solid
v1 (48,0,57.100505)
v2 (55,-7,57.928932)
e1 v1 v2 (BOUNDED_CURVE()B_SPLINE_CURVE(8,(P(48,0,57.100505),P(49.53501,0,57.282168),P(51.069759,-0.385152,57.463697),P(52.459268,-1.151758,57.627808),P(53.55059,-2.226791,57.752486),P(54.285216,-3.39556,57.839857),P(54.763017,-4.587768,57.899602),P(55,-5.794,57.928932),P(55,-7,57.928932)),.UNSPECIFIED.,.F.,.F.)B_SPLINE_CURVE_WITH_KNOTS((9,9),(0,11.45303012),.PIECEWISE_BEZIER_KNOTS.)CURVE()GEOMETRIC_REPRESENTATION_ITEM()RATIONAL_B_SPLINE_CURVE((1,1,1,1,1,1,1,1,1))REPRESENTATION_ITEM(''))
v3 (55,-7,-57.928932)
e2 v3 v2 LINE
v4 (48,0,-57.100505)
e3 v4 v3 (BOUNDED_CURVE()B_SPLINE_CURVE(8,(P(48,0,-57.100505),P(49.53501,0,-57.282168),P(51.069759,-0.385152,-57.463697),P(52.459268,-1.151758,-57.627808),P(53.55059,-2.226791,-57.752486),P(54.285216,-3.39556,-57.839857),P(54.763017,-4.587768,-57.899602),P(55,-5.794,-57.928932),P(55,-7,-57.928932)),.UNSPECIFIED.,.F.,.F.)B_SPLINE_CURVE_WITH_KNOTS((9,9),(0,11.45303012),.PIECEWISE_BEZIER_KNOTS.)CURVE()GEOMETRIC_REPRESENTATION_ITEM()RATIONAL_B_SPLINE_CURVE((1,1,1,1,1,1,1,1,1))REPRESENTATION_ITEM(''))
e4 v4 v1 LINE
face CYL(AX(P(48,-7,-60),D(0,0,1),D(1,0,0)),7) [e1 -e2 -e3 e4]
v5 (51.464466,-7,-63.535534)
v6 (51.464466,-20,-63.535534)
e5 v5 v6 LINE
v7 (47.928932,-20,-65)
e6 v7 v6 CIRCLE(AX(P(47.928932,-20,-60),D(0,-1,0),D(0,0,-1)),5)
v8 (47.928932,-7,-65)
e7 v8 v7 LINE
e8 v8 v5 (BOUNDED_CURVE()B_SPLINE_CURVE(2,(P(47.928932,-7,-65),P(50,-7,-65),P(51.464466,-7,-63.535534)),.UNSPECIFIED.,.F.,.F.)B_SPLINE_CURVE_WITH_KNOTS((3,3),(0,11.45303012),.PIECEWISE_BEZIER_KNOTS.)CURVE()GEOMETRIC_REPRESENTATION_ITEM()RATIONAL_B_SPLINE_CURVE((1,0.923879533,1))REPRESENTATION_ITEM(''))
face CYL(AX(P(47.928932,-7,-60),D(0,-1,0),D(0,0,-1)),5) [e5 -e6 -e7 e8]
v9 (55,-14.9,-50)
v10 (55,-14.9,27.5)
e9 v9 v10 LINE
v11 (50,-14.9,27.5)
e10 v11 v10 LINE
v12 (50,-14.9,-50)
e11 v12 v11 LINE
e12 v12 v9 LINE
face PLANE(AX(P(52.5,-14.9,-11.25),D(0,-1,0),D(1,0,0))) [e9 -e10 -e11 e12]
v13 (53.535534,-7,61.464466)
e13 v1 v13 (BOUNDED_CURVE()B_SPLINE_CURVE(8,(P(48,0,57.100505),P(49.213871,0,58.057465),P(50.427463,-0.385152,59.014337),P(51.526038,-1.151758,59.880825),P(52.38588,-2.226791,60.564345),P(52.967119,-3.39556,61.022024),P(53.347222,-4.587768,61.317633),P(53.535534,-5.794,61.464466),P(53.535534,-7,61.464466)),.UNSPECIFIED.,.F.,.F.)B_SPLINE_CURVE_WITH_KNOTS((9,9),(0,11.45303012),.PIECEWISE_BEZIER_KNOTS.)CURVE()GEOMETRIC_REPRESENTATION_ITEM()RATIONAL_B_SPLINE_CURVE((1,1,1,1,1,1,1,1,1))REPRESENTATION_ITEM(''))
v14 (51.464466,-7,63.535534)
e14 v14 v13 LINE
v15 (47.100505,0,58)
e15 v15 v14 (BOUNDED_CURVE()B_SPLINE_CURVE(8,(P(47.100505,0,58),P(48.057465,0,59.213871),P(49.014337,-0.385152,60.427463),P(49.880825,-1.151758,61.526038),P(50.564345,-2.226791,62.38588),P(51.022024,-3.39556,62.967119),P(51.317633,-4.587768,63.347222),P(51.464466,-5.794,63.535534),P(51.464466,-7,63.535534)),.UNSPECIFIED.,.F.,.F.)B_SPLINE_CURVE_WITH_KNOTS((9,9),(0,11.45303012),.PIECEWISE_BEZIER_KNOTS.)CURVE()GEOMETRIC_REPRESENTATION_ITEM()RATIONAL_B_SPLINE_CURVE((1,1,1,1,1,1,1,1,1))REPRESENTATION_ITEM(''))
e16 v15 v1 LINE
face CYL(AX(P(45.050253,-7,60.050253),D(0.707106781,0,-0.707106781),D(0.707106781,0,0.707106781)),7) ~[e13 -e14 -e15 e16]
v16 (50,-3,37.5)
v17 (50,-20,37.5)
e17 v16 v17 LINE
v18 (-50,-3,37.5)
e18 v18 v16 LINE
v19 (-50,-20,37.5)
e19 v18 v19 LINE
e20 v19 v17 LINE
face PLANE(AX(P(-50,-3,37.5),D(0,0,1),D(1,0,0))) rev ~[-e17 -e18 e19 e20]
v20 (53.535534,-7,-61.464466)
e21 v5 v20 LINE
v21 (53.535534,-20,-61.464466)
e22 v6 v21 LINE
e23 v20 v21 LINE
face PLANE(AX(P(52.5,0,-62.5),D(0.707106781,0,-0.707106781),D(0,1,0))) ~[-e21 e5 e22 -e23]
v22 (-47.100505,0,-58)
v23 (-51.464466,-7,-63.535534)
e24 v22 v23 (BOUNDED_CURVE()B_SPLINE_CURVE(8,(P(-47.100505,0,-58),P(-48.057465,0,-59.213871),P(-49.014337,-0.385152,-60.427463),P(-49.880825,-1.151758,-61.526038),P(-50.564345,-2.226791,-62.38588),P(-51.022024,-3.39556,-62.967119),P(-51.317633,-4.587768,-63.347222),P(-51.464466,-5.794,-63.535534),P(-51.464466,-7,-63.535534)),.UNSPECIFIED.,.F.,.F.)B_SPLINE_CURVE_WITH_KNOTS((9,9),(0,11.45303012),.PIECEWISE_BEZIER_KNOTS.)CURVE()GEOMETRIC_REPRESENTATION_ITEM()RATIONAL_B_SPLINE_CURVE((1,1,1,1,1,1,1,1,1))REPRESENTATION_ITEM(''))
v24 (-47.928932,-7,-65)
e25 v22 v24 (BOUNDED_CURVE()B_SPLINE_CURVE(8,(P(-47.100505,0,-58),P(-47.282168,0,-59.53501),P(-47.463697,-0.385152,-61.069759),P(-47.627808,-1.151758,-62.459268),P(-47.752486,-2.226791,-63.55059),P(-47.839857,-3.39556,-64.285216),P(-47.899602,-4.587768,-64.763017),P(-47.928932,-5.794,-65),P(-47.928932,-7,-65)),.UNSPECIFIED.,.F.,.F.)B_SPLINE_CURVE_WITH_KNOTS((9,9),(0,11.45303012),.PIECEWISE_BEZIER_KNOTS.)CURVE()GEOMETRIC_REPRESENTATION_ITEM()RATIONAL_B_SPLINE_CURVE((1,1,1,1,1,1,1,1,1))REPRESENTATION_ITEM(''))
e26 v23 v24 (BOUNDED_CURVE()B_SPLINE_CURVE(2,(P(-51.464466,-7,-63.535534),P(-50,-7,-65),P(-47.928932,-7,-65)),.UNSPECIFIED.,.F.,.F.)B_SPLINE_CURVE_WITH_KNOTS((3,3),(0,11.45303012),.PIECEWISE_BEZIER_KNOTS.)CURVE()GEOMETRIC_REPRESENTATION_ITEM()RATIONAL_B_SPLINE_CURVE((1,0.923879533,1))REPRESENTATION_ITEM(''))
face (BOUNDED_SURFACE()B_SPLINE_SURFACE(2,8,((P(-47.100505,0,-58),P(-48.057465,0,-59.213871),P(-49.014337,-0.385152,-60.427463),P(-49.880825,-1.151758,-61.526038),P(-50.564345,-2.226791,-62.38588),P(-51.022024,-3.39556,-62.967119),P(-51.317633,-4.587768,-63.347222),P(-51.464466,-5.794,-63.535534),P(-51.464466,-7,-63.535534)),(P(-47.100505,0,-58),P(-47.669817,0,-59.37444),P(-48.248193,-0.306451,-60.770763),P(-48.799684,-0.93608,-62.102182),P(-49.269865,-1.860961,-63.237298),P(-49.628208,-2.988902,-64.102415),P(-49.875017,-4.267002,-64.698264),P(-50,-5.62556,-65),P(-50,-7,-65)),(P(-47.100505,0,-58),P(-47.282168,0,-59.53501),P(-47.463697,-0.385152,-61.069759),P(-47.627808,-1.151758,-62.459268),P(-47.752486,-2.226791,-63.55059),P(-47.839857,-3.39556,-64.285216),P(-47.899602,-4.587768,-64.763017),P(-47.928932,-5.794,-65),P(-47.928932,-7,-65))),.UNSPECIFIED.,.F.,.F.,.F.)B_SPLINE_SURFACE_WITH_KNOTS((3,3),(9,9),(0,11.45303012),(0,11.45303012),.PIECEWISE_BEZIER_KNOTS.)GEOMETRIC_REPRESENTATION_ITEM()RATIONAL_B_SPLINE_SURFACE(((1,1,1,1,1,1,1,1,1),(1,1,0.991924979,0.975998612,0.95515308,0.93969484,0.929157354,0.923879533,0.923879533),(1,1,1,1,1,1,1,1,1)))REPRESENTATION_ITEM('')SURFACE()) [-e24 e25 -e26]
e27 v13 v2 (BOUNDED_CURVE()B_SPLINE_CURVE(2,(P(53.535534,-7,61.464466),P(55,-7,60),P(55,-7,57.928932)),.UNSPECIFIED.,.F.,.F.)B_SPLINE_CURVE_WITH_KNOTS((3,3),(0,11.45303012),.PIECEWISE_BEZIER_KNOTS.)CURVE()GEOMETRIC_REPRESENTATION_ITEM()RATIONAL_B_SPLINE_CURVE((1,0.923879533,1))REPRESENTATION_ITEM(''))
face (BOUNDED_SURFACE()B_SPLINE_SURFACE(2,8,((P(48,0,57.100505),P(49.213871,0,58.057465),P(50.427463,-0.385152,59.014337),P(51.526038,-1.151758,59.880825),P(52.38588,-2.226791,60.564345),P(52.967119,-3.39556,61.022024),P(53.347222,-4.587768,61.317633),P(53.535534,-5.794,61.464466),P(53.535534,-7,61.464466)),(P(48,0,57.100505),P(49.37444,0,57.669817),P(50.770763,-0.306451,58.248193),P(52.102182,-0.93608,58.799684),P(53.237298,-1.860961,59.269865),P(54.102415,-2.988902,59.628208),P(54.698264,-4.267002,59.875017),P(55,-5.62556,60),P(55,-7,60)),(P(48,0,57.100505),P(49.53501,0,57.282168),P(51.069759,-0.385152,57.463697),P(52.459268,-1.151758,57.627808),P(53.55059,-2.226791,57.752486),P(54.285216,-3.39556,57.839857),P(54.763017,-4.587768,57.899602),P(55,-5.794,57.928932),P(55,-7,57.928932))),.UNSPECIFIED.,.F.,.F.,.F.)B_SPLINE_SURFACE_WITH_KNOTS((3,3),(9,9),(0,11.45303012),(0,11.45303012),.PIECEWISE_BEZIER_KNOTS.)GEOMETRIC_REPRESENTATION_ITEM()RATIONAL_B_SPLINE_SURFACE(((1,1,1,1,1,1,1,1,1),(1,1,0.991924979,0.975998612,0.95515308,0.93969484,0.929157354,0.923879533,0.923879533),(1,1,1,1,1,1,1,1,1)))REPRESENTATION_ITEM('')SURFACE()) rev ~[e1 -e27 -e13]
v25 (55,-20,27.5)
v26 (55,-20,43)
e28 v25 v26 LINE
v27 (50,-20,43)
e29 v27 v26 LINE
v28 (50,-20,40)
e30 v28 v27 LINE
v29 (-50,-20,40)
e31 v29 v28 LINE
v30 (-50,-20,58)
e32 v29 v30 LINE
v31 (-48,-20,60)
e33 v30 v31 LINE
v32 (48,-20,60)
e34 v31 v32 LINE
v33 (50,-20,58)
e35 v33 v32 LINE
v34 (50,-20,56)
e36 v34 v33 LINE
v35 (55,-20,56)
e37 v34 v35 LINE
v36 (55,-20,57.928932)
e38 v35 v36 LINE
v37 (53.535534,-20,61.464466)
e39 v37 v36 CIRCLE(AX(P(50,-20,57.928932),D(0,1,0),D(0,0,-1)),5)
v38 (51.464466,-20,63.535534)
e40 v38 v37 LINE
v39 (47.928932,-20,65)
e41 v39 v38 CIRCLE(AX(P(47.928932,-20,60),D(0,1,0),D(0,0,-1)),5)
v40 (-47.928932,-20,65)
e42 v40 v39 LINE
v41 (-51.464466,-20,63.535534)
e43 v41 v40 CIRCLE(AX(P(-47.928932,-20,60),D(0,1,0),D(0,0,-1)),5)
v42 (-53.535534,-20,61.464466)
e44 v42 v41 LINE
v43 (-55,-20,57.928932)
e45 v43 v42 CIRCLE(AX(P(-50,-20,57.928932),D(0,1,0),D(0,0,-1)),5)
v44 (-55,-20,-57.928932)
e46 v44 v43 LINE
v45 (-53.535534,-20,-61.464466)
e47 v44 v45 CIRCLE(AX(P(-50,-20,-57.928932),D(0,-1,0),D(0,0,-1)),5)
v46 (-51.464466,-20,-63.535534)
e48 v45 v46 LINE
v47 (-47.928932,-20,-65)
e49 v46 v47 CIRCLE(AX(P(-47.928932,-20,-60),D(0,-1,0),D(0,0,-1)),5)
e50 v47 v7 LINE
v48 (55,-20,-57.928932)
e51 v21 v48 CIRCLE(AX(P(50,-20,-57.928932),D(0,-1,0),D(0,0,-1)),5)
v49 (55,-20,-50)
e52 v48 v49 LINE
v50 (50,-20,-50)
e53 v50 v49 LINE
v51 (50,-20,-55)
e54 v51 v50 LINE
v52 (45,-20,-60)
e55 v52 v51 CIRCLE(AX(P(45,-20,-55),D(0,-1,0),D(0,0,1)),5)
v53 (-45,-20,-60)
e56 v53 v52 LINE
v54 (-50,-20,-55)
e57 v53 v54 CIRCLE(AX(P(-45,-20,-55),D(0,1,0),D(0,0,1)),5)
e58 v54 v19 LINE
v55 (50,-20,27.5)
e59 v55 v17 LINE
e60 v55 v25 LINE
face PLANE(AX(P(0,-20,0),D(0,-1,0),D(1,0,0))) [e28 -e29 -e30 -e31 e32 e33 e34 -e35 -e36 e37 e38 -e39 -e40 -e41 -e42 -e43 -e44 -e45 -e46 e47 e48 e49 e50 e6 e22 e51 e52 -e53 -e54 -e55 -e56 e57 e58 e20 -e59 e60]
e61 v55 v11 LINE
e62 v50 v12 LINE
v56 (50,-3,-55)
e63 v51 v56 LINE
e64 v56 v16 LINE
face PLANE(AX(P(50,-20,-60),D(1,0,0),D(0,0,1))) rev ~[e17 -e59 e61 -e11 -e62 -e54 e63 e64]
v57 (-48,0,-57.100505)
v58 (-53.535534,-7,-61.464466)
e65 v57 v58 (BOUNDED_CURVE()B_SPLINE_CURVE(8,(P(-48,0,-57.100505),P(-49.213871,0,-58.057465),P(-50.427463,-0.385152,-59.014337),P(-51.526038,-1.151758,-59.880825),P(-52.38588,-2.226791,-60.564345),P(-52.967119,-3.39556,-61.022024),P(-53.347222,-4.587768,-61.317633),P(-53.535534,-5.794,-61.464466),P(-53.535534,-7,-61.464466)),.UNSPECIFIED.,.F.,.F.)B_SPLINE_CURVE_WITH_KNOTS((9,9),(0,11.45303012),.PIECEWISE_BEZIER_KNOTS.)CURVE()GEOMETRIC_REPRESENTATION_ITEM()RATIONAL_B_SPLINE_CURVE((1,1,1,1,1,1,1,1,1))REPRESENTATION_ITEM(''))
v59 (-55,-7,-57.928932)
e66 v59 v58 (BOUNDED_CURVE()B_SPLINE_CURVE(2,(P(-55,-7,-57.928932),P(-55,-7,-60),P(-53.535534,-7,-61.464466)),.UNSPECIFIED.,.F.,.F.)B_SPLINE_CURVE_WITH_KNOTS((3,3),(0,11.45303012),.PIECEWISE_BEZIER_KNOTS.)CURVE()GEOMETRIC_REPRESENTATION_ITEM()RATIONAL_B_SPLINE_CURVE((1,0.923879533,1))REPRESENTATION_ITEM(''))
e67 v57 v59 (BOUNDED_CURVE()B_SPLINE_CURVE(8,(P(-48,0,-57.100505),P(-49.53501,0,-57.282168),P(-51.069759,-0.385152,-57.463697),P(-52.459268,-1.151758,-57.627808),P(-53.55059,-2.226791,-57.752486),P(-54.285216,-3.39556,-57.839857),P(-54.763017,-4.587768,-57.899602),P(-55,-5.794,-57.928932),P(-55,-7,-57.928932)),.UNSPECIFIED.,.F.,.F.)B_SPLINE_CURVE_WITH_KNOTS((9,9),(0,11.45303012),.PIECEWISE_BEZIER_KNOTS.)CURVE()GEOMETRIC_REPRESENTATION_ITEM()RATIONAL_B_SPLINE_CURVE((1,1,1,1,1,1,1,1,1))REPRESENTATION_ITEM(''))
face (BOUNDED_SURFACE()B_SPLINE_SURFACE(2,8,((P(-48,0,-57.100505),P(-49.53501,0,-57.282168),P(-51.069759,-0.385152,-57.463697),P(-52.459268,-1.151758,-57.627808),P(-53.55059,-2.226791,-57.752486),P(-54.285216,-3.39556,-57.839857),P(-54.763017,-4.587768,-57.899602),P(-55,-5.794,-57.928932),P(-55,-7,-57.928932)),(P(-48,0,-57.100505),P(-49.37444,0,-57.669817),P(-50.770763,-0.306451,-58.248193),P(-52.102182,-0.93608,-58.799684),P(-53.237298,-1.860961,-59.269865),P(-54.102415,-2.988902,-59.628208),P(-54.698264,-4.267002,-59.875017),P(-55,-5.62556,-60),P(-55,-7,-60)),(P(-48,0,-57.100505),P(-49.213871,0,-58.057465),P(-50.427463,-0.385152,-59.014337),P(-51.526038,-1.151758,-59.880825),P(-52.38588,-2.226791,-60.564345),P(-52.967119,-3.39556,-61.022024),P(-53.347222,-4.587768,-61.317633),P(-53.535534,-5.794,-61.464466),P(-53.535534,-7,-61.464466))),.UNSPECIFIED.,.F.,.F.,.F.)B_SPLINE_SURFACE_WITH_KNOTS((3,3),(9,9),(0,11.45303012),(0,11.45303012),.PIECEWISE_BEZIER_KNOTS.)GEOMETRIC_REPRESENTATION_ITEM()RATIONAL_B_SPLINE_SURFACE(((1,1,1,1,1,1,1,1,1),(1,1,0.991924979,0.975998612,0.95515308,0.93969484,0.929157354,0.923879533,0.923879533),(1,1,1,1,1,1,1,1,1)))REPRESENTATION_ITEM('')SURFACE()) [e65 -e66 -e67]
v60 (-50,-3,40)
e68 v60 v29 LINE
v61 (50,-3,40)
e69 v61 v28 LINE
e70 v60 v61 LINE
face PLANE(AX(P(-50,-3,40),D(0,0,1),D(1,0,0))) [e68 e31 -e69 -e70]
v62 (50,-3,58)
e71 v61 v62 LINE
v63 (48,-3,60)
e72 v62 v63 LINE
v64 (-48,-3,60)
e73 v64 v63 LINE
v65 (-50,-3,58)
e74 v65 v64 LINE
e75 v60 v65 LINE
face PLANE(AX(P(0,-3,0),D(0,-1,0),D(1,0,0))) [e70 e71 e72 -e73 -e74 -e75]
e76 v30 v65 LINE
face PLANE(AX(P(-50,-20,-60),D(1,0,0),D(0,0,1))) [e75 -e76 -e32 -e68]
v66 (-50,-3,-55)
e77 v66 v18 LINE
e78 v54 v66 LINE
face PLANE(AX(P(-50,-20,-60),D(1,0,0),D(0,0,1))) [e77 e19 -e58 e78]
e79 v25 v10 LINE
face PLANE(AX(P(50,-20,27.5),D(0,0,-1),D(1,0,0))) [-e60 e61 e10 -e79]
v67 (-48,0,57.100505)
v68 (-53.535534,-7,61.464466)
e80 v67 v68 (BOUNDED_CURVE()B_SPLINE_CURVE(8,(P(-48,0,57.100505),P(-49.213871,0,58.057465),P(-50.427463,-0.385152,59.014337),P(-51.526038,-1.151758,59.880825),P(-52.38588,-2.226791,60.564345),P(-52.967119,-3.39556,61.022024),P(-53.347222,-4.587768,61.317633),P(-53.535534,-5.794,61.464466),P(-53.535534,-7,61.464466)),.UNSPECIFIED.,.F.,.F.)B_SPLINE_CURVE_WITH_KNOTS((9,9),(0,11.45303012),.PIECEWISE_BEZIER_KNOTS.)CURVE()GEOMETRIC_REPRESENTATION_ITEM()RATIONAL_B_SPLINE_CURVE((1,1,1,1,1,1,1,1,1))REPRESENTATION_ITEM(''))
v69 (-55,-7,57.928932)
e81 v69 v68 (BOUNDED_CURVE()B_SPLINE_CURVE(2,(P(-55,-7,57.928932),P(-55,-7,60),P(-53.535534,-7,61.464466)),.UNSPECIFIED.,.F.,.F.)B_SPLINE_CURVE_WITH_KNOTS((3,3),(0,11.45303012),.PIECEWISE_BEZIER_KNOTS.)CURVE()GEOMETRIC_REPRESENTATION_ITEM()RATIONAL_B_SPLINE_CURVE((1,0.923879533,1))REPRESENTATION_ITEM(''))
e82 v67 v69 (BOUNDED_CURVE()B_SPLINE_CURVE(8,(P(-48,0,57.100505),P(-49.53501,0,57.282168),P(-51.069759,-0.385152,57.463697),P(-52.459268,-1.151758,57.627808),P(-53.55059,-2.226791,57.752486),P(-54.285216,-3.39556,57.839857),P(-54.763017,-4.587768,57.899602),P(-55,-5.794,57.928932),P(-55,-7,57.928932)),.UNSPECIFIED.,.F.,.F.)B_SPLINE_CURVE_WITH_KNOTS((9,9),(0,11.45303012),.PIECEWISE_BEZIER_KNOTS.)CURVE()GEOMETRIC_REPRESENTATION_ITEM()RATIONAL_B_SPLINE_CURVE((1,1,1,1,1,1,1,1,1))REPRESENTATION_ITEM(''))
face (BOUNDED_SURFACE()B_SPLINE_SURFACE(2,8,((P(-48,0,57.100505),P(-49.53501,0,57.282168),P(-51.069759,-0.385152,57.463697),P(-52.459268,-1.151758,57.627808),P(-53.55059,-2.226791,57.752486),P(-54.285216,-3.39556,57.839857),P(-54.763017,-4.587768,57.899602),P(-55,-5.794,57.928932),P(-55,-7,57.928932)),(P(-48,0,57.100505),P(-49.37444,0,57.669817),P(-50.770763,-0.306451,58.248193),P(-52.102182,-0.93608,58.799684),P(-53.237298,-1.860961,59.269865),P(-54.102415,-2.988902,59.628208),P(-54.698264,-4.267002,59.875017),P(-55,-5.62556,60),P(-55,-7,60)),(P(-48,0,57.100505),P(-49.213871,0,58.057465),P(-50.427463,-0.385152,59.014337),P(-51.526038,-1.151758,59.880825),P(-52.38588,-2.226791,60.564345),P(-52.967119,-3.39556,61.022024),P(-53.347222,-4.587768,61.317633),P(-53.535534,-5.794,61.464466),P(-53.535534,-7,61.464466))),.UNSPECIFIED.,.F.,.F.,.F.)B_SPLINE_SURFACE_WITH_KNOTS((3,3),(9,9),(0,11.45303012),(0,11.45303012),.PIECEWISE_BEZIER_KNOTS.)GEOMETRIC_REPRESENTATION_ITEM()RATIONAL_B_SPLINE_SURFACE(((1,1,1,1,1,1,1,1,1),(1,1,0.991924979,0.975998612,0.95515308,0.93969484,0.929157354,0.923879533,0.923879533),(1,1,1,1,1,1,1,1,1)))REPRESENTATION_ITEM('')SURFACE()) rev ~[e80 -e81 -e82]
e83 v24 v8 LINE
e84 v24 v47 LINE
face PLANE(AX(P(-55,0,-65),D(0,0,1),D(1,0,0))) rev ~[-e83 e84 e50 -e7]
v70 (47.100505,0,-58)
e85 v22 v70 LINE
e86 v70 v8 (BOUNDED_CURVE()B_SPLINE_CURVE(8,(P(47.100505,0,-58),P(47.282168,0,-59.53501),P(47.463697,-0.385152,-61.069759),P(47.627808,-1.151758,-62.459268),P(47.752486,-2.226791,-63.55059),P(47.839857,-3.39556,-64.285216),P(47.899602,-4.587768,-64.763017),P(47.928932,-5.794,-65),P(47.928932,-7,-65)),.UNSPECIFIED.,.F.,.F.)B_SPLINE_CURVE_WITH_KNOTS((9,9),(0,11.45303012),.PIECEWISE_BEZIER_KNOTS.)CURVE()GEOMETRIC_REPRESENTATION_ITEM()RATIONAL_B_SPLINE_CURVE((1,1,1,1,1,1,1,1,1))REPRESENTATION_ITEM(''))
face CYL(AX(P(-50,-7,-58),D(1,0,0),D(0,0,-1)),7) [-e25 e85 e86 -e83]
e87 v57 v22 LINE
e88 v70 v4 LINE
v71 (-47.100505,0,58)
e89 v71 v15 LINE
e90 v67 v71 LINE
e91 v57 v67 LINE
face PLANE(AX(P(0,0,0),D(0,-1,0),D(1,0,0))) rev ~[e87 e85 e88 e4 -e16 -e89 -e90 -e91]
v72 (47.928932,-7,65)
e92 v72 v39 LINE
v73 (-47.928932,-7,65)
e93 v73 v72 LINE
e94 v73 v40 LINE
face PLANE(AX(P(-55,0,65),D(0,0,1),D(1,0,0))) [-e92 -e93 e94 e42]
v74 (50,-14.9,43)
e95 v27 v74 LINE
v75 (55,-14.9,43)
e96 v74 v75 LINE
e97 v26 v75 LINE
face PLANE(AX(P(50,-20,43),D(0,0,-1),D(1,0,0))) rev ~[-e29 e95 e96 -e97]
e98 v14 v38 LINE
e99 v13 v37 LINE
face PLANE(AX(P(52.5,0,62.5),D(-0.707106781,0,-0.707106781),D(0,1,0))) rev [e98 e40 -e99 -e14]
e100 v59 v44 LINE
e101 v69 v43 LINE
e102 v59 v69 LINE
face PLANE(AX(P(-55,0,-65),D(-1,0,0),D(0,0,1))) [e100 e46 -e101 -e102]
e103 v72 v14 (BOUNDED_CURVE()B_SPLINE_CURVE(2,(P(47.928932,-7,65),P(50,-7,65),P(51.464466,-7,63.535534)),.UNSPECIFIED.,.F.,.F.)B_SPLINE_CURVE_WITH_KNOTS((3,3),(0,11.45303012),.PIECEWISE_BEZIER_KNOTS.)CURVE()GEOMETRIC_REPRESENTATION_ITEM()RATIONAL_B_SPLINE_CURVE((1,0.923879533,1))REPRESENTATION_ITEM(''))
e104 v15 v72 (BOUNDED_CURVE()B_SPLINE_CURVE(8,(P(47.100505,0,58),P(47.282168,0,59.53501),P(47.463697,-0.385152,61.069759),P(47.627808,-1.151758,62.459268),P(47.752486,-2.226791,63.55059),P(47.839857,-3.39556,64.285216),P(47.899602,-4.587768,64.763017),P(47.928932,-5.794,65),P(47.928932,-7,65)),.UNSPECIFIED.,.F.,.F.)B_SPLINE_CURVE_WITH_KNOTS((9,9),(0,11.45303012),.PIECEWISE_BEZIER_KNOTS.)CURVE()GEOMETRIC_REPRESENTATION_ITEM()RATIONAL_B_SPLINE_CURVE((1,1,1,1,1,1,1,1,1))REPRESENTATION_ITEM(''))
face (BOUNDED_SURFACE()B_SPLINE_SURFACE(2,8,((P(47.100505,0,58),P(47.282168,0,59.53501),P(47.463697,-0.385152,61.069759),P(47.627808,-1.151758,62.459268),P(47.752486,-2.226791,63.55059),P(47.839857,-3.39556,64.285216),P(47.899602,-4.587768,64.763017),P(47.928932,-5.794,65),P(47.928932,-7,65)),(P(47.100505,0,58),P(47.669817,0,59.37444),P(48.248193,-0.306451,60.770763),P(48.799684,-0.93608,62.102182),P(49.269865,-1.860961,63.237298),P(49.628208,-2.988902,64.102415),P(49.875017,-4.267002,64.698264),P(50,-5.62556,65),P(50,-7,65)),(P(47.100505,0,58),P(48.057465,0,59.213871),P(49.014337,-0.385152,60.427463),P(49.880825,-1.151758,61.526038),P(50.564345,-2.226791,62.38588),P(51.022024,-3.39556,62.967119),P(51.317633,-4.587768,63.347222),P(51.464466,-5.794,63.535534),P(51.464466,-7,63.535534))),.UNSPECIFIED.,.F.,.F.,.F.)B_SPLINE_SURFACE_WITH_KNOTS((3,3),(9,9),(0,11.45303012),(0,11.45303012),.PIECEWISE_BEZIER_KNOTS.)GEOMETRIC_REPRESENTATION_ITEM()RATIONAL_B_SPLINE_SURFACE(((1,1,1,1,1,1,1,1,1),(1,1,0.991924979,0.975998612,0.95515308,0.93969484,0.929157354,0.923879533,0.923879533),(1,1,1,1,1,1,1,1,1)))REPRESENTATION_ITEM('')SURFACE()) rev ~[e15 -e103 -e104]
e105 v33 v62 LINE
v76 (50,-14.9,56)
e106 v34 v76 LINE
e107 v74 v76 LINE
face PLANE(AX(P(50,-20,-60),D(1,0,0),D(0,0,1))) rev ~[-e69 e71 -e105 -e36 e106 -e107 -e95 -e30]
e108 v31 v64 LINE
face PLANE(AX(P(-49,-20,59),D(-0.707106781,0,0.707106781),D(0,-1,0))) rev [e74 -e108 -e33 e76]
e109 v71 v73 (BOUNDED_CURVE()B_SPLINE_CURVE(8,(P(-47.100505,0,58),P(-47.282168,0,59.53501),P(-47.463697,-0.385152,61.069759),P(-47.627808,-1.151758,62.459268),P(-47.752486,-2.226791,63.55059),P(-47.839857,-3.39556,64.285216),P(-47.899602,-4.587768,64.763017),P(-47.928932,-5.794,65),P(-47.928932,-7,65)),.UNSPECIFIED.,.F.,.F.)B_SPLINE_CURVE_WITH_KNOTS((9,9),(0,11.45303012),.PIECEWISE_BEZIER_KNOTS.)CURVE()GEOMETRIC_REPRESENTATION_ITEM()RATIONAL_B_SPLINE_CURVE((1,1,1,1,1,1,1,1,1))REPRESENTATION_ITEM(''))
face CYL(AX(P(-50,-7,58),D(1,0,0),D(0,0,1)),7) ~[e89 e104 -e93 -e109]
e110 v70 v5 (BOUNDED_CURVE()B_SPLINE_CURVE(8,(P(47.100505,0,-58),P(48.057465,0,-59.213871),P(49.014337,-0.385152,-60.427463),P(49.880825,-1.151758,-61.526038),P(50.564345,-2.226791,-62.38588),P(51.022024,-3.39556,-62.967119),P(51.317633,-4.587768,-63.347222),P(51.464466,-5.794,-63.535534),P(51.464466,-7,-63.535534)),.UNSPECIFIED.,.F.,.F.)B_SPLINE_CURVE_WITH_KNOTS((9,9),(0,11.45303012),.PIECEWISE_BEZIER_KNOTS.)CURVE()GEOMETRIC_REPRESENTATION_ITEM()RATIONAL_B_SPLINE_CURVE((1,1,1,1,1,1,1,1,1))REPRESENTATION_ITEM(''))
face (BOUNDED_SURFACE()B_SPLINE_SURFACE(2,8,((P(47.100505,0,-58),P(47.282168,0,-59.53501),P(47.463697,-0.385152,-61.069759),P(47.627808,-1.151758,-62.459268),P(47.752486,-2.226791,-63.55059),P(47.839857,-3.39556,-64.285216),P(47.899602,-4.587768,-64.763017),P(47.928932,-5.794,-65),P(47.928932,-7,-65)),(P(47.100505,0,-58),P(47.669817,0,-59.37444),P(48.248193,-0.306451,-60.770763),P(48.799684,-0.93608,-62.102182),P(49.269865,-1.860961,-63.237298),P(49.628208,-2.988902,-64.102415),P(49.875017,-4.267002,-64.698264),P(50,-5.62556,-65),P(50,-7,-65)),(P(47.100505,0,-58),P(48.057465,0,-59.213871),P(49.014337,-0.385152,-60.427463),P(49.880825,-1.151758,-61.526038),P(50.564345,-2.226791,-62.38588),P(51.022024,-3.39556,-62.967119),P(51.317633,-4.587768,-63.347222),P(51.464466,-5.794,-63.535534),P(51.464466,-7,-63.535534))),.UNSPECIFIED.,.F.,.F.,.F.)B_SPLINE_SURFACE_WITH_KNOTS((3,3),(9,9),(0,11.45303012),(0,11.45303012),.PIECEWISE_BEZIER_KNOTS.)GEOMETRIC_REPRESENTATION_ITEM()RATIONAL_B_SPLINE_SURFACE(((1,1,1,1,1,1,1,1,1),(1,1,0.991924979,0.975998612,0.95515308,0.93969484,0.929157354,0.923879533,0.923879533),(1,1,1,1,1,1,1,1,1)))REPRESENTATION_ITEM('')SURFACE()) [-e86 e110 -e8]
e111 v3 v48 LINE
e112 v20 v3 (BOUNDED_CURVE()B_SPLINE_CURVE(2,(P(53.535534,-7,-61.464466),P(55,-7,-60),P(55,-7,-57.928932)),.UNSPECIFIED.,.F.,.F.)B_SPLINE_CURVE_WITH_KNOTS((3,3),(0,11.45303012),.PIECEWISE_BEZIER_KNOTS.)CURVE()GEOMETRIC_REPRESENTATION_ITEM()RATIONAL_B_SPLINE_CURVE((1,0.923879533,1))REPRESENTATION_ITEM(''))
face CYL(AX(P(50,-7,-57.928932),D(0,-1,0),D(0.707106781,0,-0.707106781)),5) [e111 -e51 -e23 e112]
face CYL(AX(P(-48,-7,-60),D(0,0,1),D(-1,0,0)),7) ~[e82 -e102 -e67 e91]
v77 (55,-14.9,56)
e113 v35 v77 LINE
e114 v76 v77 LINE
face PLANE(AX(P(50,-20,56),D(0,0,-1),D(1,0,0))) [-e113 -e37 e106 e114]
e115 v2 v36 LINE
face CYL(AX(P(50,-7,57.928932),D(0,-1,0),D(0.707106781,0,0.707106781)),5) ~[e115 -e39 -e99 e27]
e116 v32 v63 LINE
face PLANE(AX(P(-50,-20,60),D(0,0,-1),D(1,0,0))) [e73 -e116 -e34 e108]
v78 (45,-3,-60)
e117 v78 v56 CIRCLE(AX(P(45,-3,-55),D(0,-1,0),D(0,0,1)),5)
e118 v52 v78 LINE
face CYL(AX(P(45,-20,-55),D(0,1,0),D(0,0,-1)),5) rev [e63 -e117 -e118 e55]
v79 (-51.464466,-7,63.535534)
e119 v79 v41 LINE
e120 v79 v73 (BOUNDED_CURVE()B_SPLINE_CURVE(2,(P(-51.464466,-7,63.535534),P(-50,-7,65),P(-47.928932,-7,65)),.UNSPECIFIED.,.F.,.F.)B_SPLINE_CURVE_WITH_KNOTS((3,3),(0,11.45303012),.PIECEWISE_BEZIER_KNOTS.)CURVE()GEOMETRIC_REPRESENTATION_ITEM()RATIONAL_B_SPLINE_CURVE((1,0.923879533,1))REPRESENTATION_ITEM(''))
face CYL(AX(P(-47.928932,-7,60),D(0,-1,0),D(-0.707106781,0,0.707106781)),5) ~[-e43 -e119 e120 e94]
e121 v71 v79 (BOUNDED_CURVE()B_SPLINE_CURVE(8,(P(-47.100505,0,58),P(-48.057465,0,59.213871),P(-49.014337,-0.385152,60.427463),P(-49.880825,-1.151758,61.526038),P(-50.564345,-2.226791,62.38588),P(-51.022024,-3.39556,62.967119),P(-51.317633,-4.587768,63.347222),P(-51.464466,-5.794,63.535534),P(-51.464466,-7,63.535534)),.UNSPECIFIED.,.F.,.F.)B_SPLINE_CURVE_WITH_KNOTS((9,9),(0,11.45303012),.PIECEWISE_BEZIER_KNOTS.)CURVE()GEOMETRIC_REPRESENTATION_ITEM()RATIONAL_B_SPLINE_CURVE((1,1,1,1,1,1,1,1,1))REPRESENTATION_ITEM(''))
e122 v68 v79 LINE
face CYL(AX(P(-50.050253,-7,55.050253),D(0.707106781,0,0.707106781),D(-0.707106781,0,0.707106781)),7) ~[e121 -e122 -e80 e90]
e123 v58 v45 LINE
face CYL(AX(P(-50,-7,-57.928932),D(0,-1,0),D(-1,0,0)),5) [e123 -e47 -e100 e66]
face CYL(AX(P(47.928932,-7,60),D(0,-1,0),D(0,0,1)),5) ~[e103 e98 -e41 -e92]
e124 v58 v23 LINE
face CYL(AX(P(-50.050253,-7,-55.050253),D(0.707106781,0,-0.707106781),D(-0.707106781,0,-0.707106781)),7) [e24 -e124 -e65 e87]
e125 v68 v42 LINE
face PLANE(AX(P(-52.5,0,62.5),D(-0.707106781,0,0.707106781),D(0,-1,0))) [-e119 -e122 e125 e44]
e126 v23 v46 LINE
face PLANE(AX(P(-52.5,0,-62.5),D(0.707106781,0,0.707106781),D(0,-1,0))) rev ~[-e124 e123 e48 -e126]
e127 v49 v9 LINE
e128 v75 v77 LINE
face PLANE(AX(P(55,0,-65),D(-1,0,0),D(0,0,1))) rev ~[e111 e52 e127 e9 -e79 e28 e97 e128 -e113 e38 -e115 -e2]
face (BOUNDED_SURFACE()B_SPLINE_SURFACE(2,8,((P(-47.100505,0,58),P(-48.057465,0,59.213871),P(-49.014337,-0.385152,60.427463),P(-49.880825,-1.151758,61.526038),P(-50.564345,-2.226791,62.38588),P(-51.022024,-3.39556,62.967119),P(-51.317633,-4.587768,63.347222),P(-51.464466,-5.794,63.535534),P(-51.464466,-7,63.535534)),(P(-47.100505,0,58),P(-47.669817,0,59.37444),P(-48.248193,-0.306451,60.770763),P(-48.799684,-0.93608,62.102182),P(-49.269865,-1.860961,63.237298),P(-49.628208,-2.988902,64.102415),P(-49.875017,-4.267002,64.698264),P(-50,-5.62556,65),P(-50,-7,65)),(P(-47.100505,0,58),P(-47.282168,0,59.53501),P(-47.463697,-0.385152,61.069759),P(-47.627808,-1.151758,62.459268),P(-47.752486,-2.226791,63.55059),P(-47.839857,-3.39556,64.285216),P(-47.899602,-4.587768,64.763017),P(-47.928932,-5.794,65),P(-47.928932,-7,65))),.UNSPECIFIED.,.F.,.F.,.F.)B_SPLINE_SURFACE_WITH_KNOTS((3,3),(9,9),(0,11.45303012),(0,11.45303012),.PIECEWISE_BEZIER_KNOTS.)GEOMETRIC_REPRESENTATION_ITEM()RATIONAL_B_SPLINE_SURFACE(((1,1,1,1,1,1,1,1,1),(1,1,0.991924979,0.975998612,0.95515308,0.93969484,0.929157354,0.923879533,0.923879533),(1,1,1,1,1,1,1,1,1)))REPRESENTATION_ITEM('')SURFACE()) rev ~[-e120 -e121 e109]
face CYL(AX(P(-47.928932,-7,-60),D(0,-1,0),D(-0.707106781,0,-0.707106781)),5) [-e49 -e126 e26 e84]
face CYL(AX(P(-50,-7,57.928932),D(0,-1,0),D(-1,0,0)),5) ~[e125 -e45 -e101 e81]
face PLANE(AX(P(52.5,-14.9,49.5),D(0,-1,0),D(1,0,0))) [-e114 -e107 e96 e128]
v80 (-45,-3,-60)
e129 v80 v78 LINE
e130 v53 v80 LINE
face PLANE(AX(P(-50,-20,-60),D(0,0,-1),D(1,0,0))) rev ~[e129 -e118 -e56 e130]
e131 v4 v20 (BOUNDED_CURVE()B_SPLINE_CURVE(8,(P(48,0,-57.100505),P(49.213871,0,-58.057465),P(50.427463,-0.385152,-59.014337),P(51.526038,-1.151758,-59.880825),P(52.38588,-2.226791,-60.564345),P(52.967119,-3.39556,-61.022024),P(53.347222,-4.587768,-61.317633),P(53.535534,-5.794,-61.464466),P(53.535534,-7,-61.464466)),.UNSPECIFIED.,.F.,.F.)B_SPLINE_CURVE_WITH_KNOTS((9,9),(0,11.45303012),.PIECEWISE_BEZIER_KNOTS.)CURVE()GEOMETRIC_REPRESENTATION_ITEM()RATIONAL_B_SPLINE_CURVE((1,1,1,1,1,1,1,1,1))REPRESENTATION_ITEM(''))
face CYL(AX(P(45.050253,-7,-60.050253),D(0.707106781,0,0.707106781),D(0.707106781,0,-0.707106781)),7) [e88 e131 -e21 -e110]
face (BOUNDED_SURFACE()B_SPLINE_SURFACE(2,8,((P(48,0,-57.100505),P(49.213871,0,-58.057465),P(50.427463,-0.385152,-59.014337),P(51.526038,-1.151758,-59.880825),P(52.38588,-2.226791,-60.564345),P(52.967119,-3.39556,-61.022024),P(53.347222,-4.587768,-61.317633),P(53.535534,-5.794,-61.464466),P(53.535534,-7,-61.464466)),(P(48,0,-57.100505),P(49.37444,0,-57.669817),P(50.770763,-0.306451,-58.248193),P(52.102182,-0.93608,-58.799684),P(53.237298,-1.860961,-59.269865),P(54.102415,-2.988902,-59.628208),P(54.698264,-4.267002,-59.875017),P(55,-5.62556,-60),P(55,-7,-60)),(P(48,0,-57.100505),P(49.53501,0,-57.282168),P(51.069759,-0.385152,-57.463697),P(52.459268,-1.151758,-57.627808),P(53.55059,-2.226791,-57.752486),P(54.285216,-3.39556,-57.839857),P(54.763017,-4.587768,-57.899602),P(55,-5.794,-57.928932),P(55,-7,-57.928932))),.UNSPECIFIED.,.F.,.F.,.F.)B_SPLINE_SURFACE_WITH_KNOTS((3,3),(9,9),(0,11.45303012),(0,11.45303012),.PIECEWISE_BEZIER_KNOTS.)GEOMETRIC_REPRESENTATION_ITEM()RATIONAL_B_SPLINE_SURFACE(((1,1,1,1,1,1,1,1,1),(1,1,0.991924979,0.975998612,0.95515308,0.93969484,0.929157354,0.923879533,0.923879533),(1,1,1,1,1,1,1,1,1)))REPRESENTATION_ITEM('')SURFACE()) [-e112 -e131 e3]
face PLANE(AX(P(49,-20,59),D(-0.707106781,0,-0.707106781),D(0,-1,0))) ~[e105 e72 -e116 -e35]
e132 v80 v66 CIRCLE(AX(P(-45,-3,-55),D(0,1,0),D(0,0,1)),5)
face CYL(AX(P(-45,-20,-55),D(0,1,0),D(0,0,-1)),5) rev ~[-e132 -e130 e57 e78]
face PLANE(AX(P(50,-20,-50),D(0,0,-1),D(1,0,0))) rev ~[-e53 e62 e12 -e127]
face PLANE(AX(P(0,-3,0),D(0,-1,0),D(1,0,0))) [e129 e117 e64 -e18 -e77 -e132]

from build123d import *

# Parameters (mm, degrees)
F0_W      = 110
F0_H      = 130
F1_DEPTH  = 20
F2_W      = 100
F2_H      = 120
F3_DEPTH  = 17
F4_W      = 100
F4_H      = 2.5
F5_DEPTH  = 17
F6_SIZE   = 5
F7_SIZE   = 2
F8_R      = 7
F9_R      = 5
F10_R     = 5
F11_R     = 5
F12_W     = 5
F12_H     = 77.5
F13_DEPTH = 5.1
F14_W     = 5
F14_H     = 13
F15_DEPTH = 5.1


with BuildPart() as f1:
    # F0 (on Front) → F1 (new body)
    with BuildSketch(Plane.XZ):
        Rectangle(F0_W, F0_H)
    extrude(amount=F1_DEPTH)

    # F2 (on face) → F3 (cut)
    with BuildSketch(Plane.XZ.offset(20)):
        Rectangle(F2_W, F2_H)
    extrude(amount=-F3_DEPTH, mode=Mode.SUBTRACT)

    # F4 (on face) → F5 (join, through all)
    with BuildSketch(Plane.XZ.offset(3)):
        with Locations((0, 38.75)):
            Rectangle(F4_W, F4_H)
    extrude(amount=F5_DEPTH)

    # F6
    f6_edges = [f1.edges().sort_by_distance(p)[0] for p in [
        (55, -10, 65),
        (-55, -10, 65),
        (55, -10, -65),
        (-55, -10, -65),
    ]]
    chamfer(f6_edges, length=F6_SIZE)

    # F7
    f7_edges = [f1.edges().sort_by_distance(p)[0] for p in [
        (50, -11.5, 60),
        (-50, -11.5, 60),
    ]]
    chamfer(f7_edges, length=F7_SIZE)

    # F8
    f8_edges = [f1.edges().sort_by_distance(p)[0] for p in [
        (0, 0, -65),
        (-52.5, 0, -62.5),
        (52.5, 0, -62.5),
        (-55, 0, 0),
        (55, 0, 0),
        (-52.5, 0, 62.5),
        (52.5, 0, 62.5),
        (0, 0, 65),
    ]]
    fillet(f8_edges, radius=F8_R)

    # F9
    f9_edges = [f1.edges().sort_by_distance(p)[0] for p in [
        (-55, -13.5, -60),
        (-50, -13.5, -65),
        (55, -13.5, -60),
        (50, -13.5, -65),
        (50, -13.5, 65),
        (55, -13.5, 60),
    ]]
    fillet(f9_edges, radius=F9_R)

    # F10
    f10_edges = [f1.edges().sort_by_distance(p)[0] for p in [
        (-50, -13.5, 65),
        (-55, -13.5, 60),
    ]]
    fillet(f10_edges, radius=F10_R)

    # F11
    f11_edges = [f1.edges().sort_by_distance(p)[0] for p in [
        (-50, -11.5, -60),
        (50, -11.5, -60),
    ]]
    fillet(f11_edges, radius=F11_R)

    # F12 (on face) → F13 (cut)
    with BuildSketch(Plane.XZ.offset(20)):
        with Locations((52.5, -11.25)):
            Rectangle(F12_W, F12_H)
    extrude(amount=-F13_DEPTH, mode=Mode.SUBTRACT)

    # F14 (on face) → F15 (cut)
    with BuildSketch(Plane.XZ.offset(20)):
        with Locations((52.5, 49.5)):
            Rectangle(F14_W, F14_H)
    extrude(amount=-F15_DEPTH, mode=Mode.SUBTRACT)


solid = f1.part
